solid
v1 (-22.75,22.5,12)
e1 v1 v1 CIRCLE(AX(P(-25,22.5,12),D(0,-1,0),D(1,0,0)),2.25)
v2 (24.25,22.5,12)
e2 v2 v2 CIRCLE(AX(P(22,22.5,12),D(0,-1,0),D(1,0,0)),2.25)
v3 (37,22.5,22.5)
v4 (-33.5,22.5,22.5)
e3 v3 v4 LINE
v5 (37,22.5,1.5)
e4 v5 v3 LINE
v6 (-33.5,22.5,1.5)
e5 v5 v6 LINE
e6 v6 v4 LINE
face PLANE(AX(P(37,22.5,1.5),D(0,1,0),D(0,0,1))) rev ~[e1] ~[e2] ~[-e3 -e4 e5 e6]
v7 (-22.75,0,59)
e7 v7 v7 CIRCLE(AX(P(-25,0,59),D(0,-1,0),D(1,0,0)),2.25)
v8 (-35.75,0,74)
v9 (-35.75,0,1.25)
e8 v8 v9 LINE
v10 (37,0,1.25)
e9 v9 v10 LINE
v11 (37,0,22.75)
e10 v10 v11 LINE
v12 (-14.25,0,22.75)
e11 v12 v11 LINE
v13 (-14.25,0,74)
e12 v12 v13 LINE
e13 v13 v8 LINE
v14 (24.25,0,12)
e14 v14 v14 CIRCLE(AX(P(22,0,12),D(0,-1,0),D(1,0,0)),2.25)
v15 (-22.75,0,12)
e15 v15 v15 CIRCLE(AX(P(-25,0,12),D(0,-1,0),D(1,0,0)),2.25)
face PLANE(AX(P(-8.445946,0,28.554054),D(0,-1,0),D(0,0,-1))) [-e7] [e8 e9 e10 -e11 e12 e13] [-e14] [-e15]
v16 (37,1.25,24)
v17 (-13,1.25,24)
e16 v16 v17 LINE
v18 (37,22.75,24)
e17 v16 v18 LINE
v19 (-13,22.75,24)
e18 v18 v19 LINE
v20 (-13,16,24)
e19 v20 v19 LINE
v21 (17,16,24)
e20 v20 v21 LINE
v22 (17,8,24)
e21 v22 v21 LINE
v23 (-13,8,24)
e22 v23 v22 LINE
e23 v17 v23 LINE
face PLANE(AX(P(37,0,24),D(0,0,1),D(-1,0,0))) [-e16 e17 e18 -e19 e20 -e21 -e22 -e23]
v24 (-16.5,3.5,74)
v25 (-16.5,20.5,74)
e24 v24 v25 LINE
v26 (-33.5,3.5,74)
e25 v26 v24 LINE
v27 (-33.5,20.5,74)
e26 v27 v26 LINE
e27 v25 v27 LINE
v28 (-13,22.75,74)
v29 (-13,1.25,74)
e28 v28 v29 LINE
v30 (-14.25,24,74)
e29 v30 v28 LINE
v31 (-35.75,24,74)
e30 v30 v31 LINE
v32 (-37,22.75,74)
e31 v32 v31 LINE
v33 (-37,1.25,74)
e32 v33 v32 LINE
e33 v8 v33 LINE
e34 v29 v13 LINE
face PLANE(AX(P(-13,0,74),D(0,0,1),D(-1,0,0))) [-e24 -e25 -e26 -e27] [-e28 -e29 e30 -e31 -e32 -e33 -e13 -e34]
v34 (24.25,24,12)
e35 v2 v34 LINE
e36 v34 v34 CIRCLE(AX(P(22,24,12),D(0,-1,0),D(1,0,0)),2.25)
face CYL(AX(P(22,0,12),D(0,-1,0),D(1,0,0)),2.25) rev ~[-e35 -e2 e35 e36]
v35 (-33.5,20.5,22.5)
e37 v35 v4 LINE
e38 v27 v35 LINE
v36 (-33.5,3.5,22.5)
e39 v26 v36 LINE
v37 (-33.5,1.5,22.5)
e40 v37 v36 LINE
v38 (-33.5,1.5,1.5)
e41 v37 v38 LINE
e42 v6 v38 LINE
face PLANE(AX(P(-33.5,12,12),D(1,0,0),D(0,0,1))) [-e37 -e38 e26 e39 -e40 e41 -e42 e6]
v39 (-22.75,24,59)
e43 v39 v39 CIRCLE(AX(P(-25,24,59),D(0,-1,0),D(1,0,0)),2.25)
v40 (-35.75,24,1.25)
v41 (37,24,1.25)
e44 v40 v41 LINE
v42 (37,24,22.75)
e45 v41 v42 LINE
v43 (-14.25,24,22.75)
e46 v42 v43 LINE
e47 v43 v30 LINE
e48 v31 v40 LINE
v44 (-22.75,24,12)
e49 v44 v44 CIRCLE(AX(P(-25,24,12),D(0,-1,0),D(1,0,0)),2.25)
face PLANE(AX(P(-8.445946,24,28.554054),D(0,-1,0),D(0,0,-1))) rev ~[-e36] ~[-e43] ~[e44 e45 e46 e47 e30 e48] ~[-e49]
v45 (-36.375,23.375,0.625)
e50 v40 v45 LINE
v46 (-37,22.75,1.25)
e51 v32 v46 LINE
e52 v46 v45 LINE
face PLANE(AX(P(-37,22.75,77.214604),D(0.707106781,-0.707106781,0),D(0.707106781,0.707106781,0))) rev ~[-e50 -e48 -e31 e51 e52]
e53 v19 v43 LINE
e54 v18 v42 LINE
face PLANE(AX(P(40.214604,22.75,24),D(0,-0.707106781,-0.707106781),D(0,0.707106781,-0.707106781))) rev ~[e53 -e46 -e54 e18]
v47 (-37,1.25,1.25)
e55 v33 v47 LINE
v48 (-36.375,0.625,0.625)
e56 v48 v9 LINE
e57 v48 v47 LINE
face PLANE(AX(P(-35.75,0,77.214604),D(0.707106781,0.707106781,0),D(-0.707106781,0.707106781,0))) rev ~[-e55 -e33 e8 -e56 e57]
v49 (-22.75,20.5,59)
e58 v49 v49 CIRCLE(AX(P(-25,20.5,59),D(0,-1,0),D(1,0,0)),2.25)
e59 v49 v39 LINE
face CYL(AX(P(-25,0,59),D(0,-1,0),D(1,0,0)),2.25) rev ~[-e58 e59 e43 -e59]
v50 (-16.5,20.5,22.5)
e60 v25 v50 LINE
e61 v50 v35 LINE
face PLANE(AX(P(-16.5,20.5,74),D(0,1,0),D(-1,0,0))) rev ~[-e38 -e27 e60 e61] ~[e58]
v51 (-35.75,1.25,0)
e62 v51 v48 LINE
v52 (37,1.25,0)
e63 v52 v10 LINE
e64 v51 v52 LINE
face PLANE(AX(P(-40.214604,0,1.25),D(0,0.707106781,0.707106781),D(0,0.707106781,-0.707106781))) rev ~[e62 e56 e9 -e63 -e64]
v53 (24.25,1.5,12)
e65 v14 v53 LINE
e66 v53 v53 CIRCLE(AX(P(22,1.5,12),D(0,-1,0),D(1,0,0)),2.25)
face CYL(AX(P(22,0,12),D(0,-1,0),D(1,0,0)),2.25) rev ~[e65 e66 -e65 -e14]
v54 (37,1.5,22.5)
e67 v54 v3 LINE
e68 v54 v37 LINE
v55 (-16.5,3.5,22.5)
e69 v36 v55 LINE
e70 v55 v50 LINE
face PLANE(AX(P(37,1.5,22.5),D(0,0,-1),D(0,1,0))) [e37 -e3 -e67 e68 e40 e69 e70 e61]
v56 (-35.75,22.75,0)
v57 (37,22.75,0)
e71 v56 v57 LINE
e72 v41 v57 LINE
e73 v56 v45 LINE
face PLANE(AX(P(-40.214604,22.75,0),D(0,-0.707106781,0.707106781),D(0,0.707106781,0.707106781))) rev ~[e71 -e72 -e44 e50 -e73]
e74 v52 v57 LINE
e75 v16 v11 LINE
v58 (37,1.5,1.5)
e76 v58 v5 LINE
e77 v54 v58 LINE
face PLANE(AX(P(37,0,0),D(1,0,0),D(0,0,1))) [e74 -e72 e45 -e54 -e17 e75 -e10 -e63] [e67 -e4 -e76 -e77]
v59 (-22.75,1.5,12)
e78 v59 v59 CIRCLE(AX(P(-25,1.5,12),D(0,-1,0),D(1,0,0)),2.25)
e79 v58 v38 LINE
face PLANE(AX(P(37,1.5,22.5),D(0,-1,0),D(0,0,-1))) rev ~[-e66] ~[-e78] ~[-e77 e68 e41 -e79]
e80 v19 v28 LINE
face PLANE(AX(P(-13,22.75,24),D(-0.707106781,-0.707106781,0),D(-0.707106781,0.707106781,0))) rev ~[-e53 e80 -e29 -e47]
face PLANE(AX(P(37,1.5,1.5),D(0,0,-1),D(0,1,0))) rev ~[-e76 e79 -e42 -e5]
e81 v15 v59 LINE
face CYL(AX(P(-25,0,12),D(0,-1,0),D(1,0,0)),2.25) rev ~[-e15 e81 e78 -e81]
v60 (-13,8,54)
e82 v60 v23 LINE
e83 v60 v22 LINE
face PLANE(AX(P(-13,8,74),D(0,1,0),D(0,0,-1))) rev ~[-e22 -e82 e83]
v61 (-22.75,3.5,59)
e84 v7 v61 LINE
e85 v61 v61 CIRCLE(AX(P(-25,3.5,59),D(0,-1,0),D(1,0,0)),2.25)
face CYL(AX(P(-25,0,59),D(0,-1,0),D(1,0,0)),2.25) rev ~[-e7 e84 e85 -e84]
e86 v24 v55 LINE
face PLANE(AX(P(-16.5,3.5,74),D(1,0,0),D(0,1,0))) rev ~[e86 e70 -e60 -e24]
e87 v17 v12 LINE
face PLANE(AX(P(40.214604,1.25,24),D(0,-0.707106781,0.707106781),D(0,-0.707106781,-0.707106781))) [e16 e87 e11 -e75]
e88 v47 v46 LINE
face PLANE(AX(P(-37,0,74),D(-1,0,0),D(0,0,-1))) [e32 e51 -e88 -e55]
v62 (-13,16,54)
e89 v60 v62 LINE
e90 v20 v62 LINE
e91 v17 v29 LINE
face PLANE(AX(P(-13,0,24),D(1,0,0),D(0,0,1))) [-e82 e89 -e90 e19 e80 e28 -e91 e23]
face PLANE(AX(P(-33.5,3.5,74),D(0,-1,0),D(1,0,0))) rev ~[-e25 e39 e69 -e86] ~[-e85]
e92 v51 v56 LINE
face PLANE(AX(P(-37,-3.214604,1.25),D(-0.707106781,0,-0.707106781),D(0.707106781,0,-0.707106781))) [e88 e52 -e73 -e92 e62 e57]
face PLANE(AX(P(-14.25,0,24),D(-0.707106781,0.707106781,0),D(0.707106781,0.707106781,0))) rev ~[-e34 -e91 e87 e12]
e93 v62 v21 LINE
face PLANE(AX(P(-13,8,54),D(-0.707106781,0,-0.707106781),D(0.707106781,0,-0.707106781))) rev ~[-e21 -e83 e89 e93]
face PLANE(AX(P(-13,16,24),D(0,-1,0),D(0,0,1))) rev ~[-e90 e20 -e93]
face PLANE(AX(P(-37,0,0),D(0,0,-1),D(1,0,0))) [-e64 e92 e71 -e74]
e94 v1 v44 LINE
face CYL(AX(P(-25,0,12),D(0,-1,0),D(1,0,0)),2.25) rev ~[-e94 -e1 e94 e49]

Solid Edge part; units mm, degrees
sketch "Sketch1" plane through (0, 0, 0) normal (0, -1, 0) x (1, 0, 0)
  line L0 (37, 24) -> (-13, 24)
  line L1 (-13, 24) -> (-13, 74)
  line L2 (-13, 74) -> (-37, 74)
  line L3 (-37, 74) -> (-37, 0)
  line L4 (-37, 0) -> (37, 0)
  line L5 (37, 0) -> (37, 24)
extrude "Protrusion1" add sketch "Sketch1" against normal blind 24
sketch "Sketch2" plane through (-25, 12, 74) normal (0, 0, 1) x (1, 0, 0)
  line L0 (8.5, -8.5) -> (8.5, 8.5)
  line L1 (8.5, 8.5) -> (-8.5, 8.5)
  line L2 (-8.5, 8.5) -> (-8.5, -8.5)
  line L3 (-8.5, -8.5) -> (8.5, -8.5)
extrude "VaciadoExtruido_1" cut sketch "Sketch2" against normal blind 72.5
sketch "Sketch3" plane through (37, 12, 12) normal (1, 0, 0) x (0, 1, 0)
  line L0 (-10.5, 10.5) -> (-10.5, -10.5)
  line L1 (-10.5, -10.5) -> (10.5, -10.5)
  line L2 (10.5, -10.5) -> (10.5, 10.5)
  line L3 (-10.5, 10.5) -> (10.5, 10.5)
extrude "Cutout1" cut sketch "Sketch3" against normal up to surface (70.5 mm away)
sketch "Sketch4" plane through (-13, 12, 49) normal (1, 0, 0) x (0, 0, 1)
  line L0 (25, 4) -> (-25, 4)
  line L1 (-25, 4) -> (-25, -4)
  line L2 (-25, -4) -> (25, -4)
  line L3 (25, 4) -> (25, -4)
extrude "Protrusion2" add sketch "Sketch4" along normal up to surface (50 mm away)
sketch "Sketch5" plane through (12, 8, 49) normal (0, -1, 0) x (0, 0, 1)
  line L0 (5, 25) -> (-25, -5)
  line L1 (-25, -25) -> (-25, -5)
  line L2 (25, -25) -> (-25, -25)
  line L3 (25, 25) -> (25, -25)
  line L4 (5, 25) -> (25, 25)
extrude "Cutout2" cut sketch "Sketch5" against normal through all
chamfer "Chaflán_1" distance 1.25 angle 45 9 edges at (-37, 0, 37) (-37, 24, 37) (-13, 0, 49) (12, 0, 24) (0, 0, 0) (-37, 12, 0) (0, 24, 0) (12, 24, 24) (-13, 24, 49)
sketch "Sketch6" plane through (0.625, 0, 37.625) normal (0, -1, 0) x (1, 0, 0)
  circle A0 centre (-25.625, 21.375) radius 2.25
  circle A1 centre (-25.625, -25.625) radius 2.25
  circle A2 centre (21.375, -25.625) radius 2.25
  dimension "D1" = 15
  dimension "D2" = 15
extrude "Cutout3" cut sketch "Sketch6" against normal through all
